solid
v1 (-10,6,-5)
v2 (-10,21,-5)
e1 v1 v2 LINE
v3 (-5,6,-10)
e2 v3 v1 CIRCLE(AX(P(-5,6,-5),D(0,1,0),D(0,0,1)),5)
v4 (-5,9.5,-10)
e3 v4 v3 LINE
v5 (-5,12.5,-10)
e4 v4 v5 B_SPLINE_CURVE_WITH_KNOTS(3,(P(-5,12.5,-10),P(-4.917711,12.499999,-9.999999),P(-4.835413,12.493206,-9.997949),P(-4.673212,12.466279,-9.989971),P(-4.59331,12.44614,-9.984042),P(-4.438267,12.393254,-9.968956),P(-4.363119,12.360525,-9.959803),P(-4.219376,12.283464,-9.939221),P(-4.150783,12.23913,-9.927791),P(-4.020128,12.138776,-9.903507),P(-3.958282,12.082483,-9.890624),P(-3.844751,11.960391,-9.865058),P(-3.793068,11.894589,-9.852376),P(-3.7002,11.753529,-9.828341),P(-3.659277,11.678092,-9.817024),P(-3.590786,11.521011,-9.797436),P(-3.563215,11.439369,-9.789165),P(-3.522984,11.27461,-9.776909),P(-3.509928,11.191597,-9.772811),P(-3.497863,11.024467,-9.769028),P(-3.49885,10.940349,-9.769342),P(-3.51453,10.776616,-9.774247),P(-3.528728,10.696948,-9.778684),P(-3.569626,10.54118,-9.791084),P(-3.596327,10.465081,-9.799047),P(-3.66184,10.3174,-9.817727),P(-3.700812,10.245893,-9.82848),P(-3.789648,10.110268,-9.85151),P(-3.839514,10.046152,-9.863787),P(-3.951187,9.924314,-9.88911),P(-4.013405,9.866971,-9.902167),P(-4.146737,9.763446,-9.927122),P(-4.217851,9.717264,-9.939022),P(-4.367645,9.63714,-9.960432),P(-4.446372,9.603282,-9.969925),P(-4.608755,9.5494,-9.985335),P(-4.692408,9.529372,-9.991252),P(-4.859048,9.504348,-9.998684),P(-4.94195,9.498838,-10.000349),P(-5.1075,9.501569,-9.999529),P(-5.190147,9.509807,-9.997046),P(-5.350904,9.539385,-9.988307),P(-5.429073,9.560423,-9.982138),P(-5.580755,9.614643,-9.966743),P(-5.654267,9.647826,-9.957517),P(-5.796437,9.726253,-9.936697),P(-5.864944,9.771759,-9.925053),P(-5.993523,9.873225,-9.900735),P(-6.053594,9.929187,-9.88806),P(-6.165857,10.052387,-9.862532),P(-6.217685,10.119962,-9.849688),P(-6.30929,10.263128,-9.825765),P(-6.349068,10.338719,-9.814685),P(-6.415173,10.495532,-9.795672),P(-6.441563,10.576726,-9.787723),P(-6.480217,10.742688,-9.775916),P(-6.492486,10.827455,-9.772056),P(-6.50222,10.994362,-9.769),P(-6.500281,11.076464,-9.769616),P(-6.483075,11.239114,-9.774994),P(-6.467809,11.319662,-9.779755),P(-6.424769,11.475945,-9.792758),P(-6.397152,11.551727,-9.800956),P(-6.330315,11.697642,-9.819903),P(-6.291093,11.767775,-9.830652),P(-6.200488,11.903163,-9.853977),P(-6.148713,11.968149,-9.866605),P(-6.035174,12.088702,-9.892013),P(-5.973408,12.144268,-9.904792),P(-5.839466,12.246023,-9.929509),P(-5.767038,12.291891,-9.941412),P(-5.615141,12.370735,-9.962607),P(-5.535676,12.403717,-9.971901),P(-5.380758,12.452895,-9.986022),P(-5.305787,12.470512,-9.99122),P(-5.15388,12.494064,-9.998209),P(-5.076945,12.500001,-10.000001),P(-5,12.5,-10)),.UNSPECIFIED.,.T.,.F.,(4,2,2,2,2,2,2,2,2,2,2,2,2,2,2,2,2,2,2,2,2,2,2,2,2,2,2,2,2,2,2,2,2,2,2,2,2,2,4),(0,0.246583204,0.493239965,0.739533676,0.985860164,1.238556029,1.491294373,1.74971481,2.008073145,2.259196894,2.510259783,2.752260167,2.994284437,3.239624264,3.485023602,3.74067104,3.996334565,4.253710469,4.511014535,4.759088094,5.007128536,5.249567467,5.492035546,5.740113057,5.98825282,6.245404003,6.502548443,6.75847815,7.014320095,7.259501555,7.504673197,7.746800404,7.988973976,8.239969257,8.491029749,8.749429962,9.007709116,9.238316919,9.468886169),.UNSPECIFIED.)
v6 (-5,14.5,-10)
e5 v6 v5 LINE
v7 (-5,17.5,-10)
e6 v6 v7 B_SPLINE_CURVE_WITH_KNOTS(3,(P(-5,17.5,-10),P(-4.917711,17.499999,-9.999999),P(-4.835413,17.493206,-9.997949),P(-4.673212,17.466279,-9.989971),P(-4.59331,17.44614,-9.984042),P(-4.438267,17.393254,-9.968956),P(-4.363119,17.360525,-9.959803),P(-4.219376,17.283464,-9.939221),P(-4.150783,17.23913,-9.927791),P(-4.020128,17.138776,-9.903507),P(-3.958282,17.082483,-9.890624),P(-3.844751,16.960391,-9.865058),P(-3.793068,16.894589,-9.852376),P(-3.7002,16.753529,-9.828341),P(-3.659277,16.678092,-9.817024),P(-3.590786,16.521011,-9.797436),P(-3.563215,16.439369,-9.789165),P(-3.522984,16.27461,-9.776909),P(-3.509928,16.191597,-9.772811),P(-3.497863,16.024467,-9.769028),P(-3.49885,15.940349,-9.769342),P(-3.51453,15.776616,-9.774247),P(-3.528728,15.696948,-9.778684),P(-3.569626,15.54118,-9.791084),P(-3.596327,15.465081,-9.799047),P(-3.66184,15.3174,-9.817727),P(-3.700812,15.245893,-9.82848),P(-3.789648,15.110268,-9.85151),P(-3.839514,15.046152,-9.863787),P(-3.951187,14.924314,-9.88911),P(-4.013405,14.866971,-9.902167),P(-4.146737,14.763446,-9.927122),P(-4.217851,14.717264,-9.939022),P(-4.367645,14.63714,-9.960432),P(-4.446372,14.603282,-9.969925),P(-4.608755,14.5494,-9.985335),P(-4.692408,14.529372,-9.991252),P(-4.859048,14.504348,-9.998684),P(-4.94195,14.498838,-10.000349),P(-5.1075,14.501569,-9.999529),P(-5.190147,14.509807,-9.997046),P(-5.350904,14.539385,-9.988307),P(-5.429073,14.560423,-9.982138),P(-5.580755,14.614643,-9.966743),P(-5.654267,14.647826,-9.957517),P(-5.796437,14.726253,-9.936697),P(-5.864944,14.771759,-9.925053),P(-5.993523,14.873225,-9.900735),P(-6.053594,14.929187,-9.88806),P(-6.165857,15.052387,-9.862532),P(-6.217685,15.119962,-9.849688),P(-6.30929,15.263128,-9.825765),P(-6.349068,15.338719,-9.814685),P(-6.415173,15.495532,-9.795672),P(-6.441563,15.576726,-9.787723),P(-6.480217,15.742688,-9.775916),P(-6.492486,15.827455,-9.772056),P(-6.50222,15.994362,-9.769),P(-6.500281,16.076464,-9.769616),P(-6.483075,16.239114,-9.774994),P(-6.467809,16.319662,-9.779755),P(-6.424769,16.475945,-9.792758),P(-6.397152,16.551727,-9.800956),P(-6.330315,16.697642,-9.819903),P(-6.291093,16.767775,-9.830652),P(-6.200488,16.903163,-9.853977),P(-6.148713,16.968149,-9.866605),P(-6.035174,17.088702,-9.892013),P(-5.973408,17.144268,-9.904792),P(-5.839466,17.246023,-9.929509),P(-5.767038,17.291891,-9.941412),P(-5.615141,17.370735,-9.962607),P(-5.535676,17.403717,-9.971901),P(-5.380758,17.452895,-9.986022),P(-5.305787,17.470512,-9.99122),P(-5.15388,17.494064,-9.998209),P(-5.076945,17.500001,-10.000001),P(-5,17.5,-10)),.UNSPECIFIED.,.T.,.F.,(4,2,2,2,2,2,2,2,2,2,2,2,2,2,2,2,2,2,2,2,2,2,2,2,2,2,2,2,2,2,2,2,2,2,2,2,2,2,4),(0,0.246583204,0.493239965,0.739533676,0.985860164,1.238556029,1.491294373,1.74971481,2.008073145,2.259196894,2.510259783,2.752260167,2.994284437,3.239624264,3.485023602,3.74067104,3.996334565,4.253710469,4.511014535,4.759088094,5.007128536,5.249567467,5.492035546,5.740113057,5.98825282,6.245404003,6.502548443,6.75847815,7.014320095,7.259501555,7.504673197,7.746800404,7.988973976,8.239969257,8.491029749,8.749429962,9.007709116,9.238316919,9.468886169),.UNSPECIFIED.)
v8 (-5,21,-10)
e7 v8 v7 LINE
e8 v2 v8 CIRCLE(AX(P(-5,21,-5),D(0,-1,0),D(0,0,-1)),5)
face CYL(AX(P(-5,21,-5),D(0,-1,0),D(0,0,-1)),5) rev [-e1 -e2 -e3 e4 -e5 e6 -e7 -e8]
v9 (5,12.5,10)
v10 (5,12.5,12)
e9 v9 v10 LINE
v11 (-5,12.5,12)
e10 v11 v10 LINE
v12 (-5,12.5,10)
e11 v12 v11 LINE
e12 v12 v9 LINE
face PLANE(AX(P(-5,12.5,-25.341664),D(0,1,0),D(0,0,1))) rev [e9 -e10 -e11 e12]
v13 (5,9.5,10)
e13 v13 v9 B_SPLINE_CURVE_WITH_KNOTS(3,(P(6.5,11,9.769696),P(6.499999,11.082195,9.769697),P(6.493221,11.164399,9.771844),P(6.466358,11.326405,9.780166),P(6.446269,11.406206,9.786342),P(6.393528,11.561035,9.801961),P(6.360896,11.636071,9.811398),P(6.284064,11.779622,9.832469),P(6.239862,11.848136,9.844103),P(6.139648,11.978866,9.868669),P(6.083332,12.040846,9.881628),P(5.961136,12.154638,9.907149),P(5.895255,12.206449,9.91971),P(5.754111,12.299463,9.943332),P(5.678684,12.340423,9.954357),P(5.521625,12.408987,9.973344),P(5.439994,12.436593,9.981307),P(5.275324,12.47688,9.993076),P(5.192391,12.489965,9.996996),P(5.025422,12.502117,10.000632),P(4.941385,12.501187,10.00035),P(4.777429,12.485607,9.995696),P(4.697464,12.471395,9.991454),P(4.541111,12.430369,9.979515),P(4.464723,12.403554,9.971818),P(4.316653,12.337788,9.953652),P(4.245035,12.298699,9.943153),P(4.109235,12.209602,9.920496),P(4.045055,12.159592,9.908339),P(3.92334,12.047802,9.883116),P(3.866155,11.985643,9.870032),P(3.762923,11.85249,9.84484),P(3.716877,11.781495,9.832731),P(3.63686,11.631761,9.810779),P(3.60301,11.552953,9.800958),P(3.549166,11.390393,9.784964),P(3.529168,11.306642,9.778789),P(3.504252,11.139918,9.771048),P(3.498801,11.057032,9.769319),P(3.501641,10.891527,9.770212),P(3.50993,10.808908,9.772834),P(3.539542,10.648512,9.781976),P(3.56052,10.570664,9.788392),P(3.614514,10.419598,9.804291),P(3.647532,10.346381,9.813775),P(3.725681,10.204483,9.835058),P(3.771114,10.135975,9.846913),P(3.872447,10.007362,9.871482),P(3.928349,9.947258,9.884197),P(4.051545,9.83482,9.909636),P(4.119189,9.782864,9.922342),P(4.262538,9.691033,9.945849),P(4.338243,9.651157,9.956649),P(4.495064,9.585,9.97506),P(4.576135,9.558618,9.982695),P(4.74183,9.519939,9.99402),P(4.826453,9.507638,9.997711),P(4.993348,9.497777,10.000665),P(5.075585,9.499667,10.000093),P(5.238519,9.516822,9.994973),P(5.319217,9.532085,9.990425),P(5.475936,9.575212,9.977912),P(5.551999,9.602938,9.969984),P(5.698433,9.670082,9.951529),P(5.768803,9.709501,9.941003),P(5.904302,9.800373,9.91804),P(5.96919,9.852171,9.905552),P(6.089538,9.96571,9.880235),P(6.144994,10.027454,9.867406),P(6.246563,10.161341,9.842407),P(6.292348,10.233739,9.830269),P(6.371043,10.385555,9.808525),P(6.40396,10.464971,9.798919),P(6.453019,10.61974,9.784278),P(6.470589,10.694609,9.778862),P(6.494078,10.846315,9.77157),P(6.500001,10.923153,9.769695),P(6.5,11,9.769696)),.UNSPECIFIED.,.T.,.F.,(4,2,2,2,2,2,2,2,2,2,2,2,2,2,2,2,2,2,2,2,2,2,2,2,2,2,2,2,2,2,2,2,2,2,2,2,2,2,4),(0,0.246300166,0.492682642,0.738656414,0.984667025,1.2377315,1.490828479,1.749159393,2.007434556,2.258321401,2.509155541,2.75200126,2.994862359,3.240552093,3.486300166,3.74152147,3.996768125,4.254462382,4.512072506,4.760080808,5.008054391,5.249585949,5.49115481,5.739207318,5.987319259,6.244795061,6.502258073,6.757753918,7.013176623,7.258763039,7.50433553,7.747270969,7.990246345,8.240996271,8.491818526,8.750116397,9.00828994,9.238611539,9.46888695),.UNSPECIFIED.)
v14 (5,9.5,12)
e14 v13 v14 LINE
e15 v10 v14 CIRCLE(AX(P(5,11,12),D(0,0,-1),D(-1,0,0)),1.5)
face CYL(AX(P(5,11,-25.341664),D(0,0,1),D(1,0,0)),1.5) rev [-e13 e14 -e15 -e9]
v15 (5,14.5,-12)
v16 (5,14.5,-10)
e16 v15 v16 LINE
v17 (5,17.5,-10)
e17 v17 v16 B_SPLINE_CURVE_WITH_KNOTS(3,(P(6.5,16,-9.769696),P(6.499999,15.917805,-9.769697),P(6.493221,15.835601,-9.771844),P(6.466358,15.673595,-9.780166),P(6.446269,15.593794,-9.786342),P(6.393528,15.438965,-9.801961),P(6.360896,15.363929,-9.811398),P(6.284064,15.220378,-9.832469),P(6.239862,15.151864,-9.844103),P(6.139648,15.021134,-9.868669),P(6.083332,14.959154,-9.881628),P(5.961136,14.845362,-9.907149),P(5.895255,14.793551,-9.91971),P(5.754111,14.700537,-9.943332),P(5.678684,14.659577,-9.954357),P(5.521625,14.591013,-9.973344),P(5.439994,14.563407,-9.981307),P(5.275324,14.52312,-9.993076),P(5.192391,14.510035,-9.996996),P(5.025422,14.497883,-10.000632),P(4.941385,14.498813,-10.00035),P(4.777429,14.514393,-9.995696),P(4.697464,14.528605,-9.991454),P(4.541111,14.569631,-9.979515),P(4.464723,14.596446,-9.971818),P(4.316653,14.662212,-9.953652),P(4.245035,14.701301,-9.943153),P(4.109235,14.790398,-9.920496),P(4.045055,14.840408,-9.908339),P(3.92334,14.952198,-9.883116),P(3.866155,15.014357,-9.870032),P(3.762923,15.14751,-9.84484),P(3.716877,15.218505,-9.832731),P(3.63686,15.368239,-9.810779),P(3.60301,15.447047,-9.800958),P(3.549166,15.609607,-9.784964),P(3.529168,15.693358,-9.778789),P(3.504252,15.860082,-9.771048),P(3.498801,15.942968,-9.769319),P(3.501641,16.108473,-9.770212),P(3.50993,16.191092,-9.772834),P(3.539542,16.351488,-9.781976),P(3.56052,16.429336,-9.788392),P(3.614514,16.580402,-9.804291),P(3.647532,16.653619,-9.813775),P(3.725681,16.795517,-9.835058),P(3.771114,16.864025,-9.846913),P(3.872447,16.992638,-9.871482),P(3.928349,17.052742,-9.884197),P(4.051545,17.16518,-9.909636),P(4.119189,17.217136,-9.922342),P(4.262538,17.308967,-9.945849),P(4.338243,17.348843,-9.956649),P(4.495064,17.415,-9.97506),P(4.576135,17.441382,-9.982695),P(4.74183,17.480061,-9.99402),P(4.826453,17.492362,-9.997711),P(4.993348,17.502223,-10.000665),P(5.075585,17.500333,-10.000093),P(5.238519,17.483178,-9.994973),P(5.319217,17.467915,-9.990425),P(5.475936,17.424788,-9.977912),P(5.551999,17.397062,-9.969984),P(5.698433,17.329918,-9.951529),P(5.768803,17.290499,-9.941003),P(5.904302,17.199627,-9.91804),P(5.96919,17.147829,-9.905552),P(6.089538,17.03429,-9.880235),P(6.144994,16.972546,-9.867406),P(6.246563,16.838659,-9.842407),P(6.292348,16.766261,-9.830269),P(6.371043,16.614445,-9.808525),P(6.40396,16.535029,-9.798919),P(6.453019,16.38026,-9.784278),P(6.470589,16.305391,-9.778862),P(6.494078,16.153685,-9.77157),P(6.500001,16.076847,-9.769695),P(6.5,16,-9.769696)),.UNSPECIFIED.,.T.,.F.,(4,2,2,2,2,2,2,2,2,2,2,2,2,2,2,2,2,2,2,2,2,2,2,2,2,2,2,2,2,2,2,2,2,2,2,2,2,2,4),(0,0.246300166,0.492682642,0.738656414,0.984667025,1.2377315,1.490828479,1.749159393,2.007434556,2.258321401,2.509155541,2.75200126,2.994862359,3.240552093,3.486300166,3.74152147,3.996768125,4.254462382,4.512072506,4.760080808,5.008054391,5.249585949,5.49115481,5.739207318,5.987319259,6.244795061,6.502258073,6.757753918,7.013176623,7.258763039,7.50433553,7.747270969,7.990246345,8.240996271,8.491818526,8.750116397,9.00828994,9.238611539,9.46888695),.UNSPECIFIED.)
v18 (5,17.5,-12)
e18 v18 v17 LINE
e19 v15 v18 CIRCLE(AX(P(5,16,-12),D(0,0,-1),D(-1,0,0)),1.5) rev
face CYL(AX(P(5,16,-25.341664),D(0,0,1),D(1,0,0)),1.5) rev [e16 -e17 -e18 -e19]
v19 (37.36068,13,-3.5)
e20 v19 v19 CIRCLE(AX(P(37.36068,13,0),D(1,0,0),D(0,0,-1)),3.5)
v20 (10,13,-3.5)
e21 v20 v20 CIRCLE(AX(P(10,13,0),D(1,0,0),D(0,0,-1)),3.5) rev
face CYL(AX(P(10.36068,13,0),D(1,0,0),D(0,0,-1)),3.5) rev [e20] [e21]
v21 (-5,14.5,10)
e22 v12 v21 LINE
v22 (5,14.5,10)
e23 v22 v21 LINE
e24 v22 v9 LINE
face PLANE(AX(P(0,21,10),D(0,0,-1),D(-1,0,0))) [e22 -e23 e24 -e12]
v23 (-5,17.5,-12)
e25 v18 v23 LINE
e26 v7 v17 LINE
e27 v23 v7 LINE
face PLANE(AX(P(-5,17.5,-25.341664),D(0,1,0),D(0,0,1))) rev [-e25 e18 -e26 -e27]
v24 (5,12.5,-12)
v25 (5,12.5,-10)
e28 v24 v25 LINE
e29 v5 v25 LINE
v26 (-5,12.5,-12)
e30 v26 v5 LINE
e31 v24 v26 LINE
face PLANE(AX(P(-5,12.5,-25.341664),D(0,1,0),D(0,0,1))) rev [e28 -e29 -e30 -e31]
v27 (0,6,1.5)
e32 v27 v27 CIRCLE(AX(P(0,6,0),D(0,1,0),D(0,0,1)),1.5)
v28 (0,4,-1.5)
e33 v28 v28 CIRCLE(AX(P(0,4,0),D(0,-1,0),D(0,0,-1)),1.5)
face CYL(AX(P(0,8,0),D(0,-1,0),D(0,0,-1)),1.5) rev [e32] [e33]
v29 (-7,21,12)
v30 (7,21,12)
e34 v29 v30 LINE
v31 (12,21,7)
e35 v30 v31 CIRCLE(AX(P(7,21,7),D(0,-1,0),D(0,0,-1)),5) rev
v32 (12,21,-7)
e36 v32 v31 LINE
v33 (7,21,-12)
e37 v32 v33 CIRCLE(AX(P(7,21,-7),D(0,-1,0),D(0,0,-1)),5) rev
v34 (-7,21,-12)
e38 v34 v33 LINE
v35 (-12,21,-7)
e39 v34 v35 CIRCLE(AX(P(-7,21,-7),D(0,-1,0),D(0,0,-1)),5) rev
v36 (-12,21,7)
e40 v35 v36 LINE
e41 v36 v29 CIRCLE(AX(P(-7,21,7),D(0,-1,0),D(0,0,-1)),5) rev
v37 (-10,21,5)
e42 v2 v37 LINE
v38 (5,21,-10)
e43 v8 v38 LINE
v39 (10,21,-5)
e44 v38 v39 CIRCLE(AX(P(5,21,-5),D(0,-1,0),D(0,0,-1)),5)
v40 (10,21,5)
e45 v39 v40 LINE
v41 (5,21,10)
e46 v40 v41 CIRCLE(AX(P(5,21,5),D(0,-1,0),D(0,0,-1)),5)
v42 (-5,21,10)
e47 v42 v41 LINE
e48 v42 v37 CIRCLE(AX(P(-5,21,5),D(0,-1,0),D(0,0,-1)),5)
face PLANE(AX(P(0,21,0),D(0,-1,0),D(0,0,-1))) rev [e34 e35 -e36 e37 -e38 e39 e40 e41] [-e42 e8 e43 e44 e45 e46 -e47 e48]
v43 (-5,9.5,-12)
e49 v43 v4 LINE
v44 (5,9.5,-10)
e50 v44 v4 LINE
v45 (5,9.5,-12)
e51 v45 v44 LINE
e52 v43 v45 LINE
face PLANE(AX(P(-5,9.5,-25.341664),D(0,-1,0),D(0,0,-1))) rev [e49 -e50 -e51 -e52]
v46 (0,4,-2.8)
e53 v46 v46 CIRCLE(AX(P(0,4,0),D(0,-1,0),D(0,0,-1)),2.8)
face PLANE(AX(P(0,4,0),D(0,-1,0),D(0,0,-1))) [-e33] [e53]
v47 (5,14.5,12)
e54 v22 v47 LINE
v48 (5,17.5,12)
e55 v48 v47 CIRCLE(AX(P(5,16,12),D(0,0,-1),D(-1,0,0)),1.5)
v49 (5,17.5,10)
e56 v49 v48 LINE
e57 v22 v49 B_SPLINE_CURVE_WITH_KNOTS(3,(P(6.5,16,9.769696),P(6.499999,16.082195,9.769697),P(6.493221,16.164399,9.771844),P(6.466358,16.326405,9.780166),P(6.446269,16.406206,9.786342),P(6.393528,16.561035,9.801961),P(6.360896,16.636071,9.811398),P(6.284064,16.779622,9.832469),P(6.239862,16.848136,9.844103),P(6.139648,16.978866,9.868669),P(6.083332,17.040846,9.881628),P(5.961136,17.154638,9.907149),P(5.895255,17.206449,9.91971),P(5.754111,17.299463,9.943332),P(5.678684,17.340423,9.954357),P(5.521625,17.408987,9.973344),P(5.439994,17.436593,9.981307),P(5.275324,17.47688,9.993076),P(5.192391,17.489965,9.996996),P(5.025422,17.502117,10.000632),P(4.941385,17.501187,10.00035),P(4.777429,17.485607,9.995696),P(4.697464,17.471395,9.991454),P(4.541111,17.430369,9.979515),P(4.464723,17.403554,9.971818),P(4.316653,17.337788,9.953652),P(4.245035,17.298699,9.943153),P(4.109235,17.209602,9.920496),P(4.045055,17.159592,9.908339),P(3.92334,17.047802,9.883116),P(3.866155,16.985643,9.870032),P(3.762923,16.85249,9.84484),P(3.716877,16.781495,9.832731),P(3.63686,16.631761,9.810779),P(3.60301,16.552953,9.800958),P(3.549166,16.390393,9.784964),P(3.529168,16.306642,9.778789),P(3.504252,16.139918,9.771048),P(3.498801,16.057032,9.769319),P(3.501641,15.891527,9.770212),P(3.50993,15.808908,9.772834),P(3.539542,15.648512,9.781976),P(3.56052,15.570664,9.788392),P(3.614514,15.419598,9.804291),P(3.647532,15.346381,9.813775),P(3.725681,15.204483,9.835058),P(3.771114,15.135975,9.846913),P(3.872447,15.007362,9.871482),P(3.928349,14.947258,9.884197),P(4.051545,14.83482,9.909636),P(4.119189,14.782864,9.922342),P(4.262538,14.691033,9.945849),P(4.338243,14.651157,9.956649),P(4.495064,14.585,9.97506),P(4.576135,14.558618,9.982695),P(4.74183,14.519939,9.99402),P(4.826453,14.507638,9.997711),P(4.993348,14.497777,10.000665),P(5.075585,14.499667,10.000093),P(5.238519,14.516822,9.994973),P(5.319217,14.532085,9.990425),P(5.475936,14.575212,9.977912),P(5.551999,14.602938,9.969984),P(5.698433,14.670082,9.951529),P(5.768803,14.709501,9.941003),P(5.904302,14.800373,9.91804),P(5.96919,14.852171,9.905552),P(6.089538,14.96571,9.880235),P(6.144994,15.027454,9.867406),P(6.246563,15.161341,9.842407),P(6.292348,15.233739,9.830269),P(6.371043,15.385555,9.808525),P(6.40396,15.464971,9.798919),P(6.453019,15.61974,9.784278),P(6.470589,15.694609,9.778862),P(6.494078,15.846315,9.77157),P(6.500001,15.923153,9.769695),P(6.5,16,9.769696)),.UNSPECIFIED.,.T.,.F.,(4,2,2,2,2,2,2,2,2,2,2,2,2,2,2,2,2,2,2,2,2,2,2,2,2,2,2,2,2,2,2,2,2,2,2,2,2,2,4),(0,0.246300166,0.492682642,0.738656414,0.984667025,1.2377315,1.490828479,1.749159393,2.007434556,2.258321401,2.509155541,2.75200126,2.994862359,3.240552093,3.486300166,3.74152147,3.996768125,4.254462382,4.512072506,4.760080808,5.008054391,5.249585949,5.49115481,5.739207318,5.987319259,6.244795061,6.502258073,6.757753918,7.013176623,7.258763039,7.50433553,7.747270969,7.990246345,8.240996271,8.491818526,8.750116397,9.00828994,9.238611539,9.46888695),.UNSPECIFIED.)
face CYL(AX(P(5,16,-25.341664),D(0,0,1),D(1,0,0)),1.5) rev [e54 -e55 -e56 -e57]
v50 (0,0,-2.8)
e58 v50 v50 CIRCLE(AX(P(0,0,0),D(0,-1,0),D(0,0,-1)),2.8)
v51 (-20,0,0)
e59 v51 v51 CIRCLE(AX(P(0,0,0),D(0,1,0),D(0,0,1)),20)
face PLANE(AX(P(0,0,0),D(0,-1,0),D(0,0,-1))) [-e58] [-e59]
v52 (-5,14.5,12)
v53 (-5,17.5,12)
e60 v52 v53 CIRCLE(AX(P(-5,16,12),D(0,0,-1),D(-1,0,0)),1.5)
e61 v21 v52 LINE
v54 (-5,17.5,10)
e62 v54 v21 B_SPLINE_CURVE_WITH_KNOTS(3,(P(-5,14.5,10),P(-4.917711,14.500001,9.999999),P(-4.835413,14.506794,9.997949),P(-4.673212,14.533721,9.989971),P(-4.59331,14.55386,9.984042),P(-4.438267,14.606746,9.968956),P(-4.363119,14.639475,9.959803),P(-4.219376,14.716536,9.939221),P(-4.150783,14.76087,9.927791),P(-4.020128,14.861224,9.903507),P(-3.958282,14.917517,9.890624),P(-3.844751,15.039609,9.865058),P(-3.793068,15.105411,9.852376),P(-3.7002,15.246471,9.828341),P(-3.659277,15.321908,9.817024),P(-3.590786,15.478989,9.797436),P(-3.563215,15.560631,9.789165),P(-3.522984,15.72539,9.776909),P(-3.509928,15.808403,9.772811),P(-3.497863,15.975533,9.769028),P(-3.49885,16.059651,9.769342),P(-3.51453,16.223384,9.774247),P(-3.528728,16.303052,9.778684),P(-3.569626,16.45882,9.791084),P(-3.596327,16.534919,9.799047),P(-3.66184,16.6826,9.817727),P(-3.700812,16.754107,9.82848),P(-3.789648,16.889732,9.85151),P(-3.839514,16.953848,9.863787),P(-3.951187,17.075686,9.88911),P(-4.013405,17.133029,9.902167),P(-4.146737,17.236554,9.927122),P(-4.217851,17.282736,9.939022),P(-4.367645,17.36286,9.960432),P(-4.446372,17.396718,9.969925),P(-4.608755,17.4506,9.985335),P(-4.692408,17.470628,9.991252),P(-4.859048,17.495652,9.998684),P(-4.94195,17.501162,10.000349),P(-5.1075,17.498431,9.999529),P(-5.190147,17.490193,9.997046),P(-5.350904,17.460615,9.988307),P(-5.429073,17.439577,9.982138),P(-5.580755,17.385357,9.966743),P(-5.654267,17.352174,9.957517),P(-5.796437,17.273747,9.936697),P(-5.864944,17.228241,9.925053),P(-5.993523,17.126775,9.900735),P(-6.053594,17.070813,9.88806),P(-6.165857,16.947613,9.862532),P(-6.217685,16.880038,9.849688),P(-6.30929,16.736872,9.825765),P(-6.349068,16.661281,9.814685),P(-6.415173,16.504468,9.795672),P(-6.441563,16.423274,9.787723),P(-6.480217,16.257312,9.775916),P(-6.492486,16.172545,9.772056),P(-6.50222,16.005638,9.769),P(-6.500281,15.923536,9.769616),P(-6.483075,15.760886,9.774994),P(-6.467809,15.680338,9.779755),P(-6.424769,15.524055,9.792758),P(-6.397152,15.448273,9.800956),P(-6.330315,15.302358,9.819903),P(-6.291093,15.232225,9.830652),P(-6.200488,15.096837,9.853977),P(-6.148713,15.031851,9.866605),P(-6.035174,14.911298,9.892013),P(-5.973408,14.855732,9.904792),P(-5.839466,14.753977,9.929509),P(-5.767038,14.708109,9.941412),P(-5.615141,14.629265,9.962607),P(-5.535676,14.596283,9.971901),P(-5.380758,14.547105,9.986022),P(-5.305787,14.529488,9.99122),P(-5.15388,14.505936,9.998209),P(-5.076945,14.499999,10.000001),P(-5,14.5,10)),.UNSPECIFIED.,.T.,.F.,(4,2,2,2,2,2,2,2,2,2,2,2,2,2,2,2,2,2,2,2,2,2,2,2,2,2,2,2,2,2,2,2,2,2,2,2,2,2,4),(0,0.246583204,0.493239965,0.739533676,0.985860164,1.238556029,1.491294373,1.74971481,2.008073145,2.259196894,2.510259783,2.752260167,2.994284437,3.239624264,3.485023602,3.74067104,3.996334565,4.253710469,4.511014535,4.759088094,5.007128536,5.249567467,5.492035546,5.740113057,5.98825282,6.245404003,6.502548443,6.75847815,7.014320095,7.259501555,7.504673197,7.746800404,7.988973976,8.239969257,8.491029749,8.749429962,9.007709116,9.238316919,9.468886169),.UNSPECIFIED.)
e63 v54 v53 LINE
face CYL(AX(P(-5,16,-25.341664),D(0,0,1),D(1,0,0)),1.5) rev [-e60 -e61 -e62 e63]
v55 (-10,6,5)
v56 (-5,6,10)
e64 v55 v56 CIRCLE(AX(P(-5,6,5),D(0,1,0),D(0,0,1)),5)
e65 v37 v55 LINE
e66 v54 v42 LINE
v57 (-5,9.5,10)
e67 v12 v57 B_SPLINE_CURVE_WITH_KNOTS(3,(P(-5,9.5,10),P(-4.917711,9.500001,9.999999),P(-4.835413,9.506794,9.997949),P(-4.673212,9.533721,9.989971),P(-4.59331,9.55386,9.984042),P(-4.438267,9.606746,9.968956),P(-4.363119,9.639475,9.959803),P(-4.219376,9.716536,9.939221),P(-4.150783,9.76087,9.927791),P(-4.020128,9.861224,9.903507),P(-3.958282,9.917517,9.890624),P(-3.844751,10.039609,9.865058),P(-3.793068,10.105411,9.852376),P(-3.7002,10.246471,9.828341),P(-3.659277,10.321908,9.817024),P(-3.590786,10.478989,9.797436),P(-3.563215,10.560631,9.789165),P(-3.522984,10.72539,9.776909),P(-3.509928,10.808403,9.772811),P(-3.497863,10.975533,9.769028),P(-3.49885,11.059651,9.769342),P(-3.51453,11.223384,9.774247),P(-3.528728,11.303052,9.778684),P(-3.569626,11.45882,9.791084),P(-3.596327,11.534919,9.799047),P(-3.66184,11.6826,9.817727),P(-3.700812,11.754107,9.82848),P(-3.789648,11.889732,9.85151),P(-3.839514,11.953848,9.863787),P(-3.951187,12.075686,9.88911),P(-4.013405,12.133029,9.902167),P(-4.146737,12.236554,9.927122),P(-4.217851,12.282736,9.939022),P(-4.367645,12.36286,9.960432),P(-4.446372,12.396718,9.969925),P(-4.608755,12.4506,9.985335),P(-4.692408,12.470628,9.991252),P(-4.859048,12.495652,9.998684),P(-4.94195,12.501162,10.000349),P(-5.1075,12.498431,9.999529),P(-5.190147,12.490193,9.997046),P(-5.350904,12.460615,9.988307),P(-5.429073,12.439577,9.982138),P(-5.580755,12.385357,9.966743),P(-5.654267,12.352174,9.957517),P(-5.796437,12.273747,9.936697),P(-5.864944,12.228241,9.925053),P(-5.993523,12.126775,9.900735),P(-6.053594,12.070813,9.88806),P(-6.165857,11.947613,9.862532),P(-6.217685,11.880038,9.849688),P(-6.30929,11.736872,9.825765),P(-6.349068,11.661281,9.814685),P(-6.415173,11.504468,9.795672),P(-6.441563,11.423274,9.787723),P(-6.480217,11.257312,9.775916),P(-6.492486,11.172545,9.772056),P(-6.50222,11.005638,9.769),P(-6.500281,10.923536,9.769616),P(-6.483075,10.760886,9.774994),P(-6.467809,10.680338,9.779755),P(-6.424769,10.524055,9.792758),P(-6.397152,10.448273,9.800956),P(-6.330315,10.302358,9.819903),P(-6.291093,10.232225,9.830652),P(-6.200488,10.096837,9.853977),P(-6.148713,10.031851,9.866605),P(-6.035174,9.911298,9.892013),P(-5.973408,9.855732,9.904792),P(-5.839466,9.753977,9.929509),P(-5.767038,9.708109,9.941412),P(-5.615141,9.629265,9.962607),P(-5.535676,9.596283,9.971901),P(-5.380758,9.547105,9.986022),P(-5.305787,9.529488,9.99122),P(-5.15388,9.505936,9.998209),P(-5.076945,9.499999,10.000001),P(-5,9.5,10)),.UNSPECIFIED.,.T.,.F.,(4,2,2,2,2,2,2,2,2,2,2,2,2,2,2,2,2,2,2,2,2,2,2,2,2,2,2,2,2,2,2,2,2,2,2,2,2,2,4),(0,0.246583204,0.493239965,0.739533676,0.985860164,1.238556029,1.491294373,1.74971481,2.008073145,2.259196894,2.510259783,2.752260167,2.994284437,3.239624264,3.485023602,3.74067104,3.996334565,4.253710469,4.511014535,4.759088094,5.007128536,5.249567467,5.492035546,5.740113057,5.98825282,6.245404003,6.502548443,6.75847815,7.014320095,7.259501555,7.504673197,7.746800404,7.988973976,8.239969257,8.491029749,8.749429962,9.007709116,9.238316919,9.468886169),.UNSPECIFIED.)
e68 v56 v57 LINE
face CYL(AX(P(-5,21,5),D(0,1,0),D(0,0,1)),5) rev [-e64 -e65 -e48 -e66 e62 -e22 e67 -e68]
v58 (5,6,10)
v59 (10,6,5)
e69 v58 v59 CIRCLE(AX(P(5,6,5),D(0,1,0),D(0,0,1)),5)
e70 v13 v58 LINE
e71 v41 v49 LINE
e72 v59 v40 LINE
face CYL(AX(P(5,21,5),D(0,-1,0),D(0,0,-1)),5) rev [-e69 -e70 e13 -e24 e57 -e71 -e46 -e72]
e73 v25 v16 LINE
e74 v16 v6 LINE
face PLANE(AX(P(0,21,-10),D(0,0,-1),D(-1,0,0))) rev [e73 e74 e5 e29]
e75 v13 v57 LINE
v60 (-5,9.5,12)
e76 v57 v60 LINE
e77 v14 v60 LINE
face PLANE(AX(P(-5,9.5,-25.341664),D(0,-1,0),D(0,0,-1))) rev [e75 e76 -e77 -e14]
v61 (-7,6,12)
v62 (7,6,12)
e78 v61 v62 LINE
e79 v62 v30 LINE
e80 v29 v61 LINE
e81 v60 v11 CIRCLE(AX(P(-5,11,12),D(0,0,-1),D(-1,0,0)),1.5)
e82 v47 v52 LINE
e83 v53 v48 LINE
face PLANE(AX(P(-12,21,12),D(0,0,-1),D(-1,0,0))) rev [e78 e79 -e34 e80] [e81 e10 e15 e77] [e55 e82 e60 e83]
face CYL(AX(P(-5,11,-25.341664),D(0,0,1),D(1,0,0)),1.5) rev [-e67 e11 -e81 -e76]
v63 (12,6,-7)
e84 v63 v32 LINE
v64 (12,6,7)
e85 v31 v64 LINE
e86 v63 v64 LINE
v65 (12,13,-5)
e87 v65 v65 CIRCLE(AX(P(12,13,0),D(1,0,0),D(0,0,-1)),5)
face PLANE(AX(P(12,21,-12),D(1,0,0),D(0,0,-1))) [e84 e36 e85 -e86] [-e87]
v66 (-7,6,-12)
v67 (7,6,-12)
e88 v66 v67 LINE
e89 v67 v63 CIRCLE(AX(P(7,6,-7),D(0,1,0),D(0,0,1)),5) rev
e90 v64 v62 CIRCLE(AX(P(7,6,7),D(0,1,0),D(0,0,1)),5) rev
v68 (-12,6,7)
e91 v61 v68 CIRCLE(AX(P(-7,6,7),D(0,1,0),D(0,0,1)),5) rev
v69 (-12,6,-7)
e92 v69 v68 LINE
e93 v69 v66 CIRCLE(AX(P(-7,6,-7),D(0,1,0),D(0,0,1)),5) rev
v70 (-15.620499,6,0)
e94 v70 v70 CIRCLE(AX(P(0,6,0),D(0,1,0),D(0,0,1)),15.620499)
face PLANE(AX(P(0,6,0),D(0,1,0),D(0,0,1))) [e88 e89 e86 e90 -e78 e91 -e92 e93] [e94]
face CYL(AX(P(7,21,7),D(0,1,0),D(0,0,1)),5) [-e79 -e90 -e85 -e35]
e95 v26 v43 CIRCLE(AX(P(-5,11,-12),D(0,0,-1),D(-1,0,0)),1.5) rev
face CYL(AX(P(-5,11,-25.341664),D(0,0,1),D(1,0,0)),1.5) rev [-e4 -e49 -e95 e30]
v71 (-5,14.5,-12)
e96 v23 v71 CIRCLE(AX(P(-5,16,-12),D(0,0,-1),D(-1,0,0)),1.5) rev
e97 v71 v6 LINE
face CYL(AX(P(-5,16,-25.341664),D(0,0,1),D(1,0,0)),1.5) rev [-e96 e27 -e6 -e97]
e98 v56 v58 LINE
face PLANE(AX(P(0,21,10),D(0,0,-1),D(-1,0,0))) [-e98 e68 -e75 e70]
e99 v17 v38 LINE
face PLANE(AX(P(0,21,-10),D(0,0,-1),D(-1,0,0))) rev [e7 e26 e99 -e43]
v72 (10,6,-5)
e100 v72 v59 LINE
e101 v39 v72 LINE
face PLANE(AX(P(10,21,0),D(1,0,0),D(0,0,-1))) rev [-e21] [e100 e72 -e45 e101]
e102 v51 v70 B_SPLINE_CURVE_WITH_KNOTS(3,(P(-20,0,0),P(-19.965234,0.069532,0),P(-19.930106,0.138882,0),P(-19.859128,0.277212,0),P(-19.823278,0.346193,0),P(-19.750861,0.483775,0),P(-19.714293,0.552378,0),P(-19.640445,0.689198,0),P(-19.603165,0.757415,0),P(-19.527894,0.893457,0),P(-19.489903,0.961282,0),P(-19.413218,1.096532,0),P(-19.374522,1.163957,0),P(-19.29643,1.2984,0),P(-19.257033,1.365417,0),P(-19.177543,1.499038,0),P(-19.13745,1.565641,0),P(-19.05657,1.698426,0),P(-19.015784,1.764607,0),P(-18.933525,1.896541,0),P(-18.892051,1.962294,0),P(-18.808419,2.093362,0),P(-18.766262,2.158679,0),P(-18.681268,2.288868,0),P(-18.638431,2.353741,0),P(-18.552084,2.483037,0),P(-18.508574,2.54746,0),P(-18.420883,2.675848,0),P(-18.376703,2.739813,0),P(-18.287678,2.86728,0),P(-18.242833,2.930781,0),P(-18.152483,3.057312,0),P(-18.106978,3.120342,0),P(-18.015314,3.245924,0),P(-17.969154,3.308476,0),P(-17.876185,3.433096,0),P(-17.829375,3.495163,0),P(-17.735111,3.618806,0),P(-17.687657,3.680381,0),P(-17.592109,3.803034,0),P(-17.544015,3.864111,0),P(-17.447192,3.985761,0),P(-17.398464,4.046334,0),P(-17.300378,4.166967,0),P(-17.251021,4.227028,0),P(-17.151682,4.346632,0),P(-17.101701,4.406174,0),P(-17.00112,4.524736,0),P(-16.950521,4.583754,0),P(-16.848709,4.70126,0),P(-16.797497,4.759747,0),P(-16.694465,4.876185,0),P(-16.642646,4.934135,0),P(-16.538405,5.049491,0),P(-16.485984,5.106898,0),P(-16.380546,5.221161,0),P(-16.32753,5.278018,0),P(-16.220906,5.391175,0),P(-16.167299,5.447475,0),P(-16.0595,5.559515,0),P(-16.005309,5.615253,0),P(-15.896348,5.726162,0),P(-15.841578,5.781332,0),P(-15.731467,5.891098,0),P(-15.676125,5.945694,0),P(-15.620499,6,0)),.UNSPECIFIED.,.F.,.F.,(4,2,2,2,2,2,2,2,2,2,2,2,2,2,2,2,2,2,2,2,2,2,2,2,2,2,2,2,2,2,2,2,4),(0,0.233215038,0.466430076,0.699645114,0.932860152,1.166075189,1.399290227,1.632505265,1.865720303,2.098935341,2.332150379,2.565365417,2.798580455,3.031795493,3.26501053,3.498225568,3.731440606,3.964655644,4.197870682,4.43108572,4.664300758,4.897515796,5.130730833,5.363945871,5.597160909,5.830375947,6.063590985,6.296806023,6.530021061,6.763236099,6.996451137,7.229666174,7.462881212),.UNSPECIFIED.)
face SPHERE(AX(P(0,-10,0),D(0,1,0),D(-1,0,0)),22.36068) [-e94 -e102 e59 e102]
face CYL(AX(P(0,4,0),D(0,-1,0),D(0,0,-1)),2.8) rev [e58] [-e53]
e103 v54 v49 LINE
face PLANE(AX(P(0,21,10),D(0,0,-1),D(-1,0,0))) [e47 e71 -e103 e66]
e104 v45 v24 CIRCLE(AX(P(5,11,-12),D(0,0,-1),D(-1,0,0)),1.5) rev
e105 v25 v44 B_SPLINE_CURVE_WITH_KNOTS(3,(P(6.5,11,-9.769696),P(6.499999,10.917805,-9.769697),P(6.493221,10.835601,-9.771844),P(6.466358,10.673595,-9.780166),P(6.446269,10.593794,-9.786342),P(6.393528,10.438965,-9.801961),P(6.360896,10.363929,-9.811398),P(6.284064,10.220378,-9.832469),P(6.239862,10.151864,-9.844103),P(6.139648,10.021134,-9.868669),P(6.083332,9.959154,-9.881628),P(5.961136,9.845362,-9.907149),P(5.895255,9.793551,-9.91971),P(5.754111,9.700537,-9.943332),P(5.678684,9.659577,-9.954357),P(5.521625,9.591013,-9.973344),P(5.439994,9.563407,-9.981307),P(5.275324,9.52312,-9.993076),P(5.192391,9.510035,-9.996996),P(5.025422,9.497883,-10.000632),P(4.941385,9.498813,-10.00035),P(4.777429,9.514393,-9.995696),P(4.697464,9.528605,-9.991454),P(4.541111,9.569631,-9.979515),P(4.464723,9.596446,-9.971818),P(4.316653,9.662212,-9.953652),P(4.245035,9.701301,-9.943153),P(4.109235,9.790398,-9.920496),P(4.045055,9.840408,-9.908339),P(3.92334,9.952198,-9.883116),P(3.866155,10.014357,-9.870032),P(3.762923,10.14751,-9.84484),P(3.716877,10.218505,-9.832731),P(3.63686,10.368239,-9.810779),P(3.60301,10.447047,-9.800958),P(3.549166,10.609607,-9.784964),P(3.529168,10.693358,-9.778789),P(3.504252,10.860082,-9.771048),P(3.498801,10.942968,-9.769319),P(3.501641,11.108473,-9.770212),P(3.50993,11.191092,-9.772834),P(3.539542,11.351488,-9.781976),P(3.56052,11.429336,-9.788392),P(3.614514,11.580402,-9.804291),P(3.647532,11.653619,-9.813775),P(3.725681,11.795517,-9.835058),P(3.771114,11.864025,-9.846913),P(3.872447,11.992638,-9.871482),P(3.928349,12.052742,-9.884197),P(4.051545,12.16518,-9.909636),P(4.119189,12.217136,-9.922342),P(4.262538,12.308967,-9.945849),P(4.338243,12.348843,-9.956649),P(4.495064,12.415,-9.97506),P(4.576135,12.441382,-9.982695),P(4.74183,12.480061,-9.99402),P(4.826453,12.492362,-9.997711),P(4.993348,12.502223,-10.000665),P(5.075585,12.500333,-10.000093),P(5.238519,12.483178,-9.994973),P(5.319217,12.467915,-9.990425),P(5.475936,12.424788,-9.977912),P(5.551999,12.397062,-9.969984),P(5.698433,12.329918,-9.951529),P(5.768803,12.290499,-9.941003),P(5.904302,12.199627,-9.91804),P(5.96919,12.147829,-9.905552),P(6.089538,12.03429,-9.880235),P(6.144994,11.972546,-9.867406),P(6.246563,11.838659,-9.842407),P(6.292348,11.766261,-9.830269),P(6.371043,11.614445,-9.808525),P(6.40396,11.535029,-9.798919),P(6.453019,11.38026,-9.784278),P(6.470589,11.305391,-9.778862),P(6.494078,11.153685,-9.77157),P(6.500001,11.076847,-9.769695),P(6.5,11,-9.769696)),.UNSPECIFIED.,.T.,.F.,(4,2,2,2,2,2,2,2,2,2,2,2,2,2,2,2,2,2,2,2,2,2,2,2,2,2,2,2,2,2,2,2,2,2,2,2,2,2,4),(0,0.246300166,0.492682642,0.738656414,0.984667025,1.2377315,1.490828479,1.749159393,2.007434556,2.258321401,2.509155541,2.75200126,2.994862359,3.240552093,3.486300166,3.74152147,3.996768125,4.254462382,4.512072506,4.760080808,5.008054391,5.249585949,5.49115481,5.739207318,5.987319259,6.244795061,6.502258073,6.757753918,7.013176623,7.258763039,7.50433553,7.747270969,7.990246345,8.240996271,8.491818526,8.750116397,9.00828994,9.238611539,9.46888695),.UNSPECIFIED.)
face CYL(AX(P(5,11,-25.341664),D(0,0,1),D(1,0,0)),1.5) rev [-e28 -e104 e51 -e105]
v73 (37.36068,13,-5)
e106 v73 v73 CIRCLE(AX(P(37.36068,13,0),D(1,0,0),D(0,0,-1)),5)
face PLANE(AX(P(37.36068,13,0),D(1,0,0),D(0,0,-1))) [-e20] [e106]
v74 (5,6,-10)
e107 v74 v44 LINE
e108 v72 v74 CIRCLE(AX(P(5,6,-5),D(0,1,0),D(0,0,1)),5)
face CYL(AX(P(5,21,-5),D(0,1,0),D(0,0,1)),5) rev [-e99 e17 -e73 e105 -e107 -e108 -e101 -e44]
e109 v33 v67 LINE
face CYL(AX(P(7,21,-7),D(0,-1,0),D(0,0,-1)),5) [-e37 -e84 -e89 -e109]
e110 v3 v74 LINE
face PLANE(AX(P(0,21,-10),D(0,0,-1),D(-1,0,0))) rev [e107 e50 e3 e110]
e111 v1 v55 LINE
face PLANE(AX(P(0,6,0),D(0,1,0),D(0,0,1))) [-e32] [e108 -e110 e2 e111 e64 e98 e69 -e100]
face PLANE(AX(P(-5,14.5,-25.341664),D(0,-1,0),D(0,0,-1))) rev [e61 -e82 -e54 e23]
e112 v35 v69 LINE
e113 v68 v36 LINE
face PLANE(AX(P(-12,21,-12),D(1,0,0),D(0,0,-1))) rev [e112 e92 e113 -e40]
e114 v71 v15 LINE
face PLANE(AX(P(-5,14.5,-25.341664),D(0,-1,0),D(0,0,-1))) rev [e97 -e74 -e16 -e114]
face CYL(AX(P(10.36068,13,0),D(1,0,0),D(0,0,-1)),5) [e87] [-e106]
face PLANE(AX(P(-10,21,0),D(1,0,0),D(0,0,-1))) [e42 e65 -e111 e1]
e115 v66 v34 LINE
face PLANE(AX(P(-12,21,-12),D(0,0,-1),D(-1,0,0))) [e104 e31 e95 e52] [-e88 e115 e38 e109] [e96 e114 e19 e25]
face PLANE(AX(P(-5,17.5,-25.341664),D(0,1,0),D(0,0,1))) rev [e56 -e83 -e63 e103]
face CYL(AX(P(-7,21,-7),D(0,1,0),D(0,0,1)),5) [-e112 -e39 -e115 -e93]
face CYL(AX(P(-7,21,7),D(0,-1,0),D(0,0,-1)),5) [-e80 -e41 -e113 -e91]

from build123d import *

# Parameters (mm, degrees)
SKETCH_3_R                      = 2.8
CUT_EXTRUDE_2_DEPTH             = 4
SKETCH_8_R                      = 1.5
CUT_EXTRUDE_5_DEPTH             = 4
SKETCH_10_W                     = 24
SKETCH_10_H                     = 24
SKETCH_10_W_2                   = 20
SKETCH_10_H_2                   = 20
EXTRUDE_1_DEPTH                 = 15
EXTRUDE_2_DEPTH                 = 15
EXTRUDE_2_DEPTH_BACK            = 12
SKETCH_7_R                      = 5
SKETCH_7_R_2                    = 3.5
SKETCH_7_5_R                    = 3.5
CUT_EXTRUDE_6_DEPTH             = 12.360679775
FILLET_START                    = 6
FILLET_1_DEPTH                  = 15
FILLET_1_2_DEPTH                = 15
CUT_EXTRUDE_7_REACH             = 55.487
CUT_EXTRUDE_7_DIRECTION_2_DEPTH = 54.486637521


with BuildPart() as part:
    # 草图1 → 旋转1 (revolve)
    with BuildSketch(Plane.XY):
        with BuildLine():
            ThreePointArc((-15.620499352, 6), (-18.061145964, 3.183133409), (-20, 0))
            Line((-20, 0), (0, 0))
            Line((0, 0), (0, 6))
            Line((0, 6), (-15.620499352, 6))
        make_face()
    revolve(axis=Axis((0, 10, 0), (0, -1, 0)))

    # 草图3 → 切除-拉伸2 (cut)
    with BuildSketch(Plane.XZ):
        with Locations(Location((0, 0, 0), (0, 0, 270))):
            Circle(SKETCH_3_R)
    extrude(amount=-CUT_EXTRUDE_2_DEPTH, mode=Mode.SUBTRACT)

    # 草图8 → 切除-拉伸5 (cut)
    with BuildSketch(Plane.XZ.offset(-4)):
        with Locations(Location((0, 0, 0), (0, 0, 270))):
            Circle(SKETCH_8_R)
    extrude(amount=-CUT_EXTRUDE_5_DEPTH, mode=Mode.SUBTRACT)

    # 草图10 → 拉伸-薄壁1 (add)
    with BuildSketch(Plane(origin=(0, 6, 0), x_dir=(1, 0, 0), z_dir=(0, 1, 0))):
        Rectangle(SKETCH_10_W, SKETCH_10_H)
        Rectangle(SKETCH_10_W_2, SKETCH_10_H_2, mode=Mode.SUBTRACT)
    extrude(amount=EXTRUDE_1_DEPTH)

    # 草图7 → 凸台-拉伸2 (add, two sides: drawn at the far end of the back side and taken through both)
    with BuildSketch(Plane(origin=(22.360679775, 0, 0), x_dir=(0, 0, -1), z_dir=(1, 0, 0)).offset(-EXTRUDE_2_DEPTH_BACK)):
        with Locations((0, 13)):
            Circle(SKETCH_7_R)
        with Locations((0, 13)):
            Circle(SKETCH_7_R_2, mode=Mode.SUBTRACT)
    extrude(amount=EXTRUDE_2_DEPTH + EXTRUDE_2_DEPTH_BACK)

    # 草图7<5> → 切除-拉伸6 (cut)
    with BuildSketch(Plane(origin=(22.360679775, 0, 0), x_dir=(0, 0, -1), z_dir=(1, 0, 0))):
        with Locations((0, 13)):
            Circle(SKETCH_7_5_R)
    extrude(amount=-CUT_EXTRUDE_6_DEPTH, mode=Mode.SUBTRACT)

    # 圆角1: read off the stored shape, not the designer's step
    # 圆角1 outline → 圆角1 (cut)
    with BuildSketch(Plane(origin=(0, 0, 0), x_dir=(1, 0, 0), z_dir=(0, 1, 0)).offset(FILLET_START)):
        with BuildLine():
            ThreePointArc((-12, 7), (-10.535533906, 10.535533906), (-7, 12))
            Line((-7, 12), (-12, 12))
            Line((-12, 12), (-12, 7))
        make_face()
        with BuildLine():
            Line((12, 12), (7, 12))
            ThreePointArc((7, 12), (10.535533906, 10.535533906), (12, 7))
            Line((12, 7), (12, 12))
        make_face()
        with BuildLine():
            ThreePointArc((-7, -12), (-10.535533906, -10.535533906), (-12, -7))
            Line((-12, -7), (-12, -12))
            Line((-12, -12), (-7, -12))
        make_face()
        with BuildLine():
            Line((12, -12), (12, -7))
            ThreePointArc((12, -7), (10.535533906, -10.535533906), (7, -12))
            Line((7, -12), (12, -12))
        make_face()
    extrude(amount=FILLET_1_DEPTH, mode=Mode.SUBTRACT)

    # Fillet 1 2 outline → Fillet 1 2 (add)
    with BuildSketch(Plane(origin=(0, 0, 0), x_dir=(1, 0, 0), z_dir=(0, 1, 0)).offset(FILLET_START)):
        with BuildLine():
            Line((10, -10), (10, -5))
            ThreePointArc((10, -5), (8.535533906, -8.535533906), (5, -10))
            Line((5, -10), (10, -10))
        make_face()
        with BuildLine():
            ThreePointArc((5, 10), (8.535533906, 8.535533906), (10, 5))
            Line((10, 5), (10, 10))
            Line((10, 10), (5, 10))
        make_face()
        with BuildLine():
            Line((-10, -10), (-5, -10))
            ThreePointArc((-5, -10), (-8.535533906, -8.535533906), (-10, -5))
            Line((-10, -5), (-10, -10))
        make_face()
        with BuildLine():
            ThreePointArc((-10, 5), (-8.535533906, 8.535533906), (-5, 10))
            Line((-5, 10), (-10, 10))
            Line((-10, 10), (-10, 5))
        make_face()
    extrude(amount=FILLET_1_2_DEPTH)

    # 切除-拉伸7: up to this face of the body (flat: up to its plane)
    cut_extrude_7_end = Plane(part.part.faces().sort_by_distance((0, 13.5, -12))[0])
    # 草图13 → 切除-拉伸7 (cut, up to the picked face)
    with BuildSketch(Plane.XY.offset(12), mode=Mode.PRIVATE) as cut_extrude_7_sk1:
        with BuildLine():
            Line((-5, 17.5), (5, 17.5))
            ThreePointArc((5, 17.5), (6.5, 16), (5, 14.5))
            Line((5, 14.5), (-5, 14.5))
            ThreePointArc((-5, 14.5), (-6.5, 16), (-5, 17.5))
        make_face()
    cut_extrude_7_tool1 = split(extrude(cut_extrude_7_sk1.sketch, amount=-CUT_EXTRUDE_7_REACH, mode=Mode.PRIVATE), bisect_by=cut_extrude_7_end, keep=Keep.BOTH, mode=Mode.PRIVATE)
    # 草图13 → 切除-拉伸7 (cut, up to the picked face)
    with BuildSketch(Plane.XY.offset(12), mode=Mode.PRIVATE) as cut_extrude_7_sk2:
        with BuildLine():
            Line((-5, 12.5), (5, 12.5))
            ThreePointArc((5, 12.5), (6.5, 11), (5, 9.5))
            Line((5, 9.5), (-5, 9.5))
            ThreePointArc((-5, 9.5), (-6.5, 11), (-5, 12.5))
        make_face()
    cut_extrude_7_tool2 = split(extrude(cut_extrude_7_sk2.sketch, amount=-CUT_EXTRUDE_7_REACH, mode=Mode.PRIVATE), bisect_by=cut_extrude_7_end, keep=Keep.BOTH, mode=Mode.PRIVATE)
    add(cut_extrude_7_tool1.solids().sort_by(Axis((0, 16, 12), (0, 0, -1)))[0], mode=Mode.SUBTRACT)
    add(cut_extrude_7_tool2.solids().sort_by(Axis((0, 11, 12), (0, 0, -1)))[0], mode=Mode.SUBTRACT)

    # 草图13 → 切除-拉伸7 direction 2 (cut)
    with BuildSketch(Plane.XY.offset(12)):
        with BuildLine():
            Line((-5, 17.5), (5, 17.5))
            ThreePointArc((5, 17.5), (6.5, 16), (5, 14.5))
            Line((5, 14.5), (-5, 14.5))
            ThreePointArc((-5, 14.5), (-6.5, 16), (-5, 17.5))
        make_face()
        with BuildLine():
            Line((-5, 12.5), (5, 12.5))
            ThreePointArc((5, 12.5), (6.5, 11), (5, 9.5))
            Line((5, 9.5), (-5, 9.5))
            ThreePointArc((-5, 9.5), (-6.5, 11), (-5, 12.5))
        make_face()
    extrude(amount=CUT_EXTRUDE_7_DIRECTION_2_DEPTH, mode=Mode.SUBTRACT)


solid = part.part
